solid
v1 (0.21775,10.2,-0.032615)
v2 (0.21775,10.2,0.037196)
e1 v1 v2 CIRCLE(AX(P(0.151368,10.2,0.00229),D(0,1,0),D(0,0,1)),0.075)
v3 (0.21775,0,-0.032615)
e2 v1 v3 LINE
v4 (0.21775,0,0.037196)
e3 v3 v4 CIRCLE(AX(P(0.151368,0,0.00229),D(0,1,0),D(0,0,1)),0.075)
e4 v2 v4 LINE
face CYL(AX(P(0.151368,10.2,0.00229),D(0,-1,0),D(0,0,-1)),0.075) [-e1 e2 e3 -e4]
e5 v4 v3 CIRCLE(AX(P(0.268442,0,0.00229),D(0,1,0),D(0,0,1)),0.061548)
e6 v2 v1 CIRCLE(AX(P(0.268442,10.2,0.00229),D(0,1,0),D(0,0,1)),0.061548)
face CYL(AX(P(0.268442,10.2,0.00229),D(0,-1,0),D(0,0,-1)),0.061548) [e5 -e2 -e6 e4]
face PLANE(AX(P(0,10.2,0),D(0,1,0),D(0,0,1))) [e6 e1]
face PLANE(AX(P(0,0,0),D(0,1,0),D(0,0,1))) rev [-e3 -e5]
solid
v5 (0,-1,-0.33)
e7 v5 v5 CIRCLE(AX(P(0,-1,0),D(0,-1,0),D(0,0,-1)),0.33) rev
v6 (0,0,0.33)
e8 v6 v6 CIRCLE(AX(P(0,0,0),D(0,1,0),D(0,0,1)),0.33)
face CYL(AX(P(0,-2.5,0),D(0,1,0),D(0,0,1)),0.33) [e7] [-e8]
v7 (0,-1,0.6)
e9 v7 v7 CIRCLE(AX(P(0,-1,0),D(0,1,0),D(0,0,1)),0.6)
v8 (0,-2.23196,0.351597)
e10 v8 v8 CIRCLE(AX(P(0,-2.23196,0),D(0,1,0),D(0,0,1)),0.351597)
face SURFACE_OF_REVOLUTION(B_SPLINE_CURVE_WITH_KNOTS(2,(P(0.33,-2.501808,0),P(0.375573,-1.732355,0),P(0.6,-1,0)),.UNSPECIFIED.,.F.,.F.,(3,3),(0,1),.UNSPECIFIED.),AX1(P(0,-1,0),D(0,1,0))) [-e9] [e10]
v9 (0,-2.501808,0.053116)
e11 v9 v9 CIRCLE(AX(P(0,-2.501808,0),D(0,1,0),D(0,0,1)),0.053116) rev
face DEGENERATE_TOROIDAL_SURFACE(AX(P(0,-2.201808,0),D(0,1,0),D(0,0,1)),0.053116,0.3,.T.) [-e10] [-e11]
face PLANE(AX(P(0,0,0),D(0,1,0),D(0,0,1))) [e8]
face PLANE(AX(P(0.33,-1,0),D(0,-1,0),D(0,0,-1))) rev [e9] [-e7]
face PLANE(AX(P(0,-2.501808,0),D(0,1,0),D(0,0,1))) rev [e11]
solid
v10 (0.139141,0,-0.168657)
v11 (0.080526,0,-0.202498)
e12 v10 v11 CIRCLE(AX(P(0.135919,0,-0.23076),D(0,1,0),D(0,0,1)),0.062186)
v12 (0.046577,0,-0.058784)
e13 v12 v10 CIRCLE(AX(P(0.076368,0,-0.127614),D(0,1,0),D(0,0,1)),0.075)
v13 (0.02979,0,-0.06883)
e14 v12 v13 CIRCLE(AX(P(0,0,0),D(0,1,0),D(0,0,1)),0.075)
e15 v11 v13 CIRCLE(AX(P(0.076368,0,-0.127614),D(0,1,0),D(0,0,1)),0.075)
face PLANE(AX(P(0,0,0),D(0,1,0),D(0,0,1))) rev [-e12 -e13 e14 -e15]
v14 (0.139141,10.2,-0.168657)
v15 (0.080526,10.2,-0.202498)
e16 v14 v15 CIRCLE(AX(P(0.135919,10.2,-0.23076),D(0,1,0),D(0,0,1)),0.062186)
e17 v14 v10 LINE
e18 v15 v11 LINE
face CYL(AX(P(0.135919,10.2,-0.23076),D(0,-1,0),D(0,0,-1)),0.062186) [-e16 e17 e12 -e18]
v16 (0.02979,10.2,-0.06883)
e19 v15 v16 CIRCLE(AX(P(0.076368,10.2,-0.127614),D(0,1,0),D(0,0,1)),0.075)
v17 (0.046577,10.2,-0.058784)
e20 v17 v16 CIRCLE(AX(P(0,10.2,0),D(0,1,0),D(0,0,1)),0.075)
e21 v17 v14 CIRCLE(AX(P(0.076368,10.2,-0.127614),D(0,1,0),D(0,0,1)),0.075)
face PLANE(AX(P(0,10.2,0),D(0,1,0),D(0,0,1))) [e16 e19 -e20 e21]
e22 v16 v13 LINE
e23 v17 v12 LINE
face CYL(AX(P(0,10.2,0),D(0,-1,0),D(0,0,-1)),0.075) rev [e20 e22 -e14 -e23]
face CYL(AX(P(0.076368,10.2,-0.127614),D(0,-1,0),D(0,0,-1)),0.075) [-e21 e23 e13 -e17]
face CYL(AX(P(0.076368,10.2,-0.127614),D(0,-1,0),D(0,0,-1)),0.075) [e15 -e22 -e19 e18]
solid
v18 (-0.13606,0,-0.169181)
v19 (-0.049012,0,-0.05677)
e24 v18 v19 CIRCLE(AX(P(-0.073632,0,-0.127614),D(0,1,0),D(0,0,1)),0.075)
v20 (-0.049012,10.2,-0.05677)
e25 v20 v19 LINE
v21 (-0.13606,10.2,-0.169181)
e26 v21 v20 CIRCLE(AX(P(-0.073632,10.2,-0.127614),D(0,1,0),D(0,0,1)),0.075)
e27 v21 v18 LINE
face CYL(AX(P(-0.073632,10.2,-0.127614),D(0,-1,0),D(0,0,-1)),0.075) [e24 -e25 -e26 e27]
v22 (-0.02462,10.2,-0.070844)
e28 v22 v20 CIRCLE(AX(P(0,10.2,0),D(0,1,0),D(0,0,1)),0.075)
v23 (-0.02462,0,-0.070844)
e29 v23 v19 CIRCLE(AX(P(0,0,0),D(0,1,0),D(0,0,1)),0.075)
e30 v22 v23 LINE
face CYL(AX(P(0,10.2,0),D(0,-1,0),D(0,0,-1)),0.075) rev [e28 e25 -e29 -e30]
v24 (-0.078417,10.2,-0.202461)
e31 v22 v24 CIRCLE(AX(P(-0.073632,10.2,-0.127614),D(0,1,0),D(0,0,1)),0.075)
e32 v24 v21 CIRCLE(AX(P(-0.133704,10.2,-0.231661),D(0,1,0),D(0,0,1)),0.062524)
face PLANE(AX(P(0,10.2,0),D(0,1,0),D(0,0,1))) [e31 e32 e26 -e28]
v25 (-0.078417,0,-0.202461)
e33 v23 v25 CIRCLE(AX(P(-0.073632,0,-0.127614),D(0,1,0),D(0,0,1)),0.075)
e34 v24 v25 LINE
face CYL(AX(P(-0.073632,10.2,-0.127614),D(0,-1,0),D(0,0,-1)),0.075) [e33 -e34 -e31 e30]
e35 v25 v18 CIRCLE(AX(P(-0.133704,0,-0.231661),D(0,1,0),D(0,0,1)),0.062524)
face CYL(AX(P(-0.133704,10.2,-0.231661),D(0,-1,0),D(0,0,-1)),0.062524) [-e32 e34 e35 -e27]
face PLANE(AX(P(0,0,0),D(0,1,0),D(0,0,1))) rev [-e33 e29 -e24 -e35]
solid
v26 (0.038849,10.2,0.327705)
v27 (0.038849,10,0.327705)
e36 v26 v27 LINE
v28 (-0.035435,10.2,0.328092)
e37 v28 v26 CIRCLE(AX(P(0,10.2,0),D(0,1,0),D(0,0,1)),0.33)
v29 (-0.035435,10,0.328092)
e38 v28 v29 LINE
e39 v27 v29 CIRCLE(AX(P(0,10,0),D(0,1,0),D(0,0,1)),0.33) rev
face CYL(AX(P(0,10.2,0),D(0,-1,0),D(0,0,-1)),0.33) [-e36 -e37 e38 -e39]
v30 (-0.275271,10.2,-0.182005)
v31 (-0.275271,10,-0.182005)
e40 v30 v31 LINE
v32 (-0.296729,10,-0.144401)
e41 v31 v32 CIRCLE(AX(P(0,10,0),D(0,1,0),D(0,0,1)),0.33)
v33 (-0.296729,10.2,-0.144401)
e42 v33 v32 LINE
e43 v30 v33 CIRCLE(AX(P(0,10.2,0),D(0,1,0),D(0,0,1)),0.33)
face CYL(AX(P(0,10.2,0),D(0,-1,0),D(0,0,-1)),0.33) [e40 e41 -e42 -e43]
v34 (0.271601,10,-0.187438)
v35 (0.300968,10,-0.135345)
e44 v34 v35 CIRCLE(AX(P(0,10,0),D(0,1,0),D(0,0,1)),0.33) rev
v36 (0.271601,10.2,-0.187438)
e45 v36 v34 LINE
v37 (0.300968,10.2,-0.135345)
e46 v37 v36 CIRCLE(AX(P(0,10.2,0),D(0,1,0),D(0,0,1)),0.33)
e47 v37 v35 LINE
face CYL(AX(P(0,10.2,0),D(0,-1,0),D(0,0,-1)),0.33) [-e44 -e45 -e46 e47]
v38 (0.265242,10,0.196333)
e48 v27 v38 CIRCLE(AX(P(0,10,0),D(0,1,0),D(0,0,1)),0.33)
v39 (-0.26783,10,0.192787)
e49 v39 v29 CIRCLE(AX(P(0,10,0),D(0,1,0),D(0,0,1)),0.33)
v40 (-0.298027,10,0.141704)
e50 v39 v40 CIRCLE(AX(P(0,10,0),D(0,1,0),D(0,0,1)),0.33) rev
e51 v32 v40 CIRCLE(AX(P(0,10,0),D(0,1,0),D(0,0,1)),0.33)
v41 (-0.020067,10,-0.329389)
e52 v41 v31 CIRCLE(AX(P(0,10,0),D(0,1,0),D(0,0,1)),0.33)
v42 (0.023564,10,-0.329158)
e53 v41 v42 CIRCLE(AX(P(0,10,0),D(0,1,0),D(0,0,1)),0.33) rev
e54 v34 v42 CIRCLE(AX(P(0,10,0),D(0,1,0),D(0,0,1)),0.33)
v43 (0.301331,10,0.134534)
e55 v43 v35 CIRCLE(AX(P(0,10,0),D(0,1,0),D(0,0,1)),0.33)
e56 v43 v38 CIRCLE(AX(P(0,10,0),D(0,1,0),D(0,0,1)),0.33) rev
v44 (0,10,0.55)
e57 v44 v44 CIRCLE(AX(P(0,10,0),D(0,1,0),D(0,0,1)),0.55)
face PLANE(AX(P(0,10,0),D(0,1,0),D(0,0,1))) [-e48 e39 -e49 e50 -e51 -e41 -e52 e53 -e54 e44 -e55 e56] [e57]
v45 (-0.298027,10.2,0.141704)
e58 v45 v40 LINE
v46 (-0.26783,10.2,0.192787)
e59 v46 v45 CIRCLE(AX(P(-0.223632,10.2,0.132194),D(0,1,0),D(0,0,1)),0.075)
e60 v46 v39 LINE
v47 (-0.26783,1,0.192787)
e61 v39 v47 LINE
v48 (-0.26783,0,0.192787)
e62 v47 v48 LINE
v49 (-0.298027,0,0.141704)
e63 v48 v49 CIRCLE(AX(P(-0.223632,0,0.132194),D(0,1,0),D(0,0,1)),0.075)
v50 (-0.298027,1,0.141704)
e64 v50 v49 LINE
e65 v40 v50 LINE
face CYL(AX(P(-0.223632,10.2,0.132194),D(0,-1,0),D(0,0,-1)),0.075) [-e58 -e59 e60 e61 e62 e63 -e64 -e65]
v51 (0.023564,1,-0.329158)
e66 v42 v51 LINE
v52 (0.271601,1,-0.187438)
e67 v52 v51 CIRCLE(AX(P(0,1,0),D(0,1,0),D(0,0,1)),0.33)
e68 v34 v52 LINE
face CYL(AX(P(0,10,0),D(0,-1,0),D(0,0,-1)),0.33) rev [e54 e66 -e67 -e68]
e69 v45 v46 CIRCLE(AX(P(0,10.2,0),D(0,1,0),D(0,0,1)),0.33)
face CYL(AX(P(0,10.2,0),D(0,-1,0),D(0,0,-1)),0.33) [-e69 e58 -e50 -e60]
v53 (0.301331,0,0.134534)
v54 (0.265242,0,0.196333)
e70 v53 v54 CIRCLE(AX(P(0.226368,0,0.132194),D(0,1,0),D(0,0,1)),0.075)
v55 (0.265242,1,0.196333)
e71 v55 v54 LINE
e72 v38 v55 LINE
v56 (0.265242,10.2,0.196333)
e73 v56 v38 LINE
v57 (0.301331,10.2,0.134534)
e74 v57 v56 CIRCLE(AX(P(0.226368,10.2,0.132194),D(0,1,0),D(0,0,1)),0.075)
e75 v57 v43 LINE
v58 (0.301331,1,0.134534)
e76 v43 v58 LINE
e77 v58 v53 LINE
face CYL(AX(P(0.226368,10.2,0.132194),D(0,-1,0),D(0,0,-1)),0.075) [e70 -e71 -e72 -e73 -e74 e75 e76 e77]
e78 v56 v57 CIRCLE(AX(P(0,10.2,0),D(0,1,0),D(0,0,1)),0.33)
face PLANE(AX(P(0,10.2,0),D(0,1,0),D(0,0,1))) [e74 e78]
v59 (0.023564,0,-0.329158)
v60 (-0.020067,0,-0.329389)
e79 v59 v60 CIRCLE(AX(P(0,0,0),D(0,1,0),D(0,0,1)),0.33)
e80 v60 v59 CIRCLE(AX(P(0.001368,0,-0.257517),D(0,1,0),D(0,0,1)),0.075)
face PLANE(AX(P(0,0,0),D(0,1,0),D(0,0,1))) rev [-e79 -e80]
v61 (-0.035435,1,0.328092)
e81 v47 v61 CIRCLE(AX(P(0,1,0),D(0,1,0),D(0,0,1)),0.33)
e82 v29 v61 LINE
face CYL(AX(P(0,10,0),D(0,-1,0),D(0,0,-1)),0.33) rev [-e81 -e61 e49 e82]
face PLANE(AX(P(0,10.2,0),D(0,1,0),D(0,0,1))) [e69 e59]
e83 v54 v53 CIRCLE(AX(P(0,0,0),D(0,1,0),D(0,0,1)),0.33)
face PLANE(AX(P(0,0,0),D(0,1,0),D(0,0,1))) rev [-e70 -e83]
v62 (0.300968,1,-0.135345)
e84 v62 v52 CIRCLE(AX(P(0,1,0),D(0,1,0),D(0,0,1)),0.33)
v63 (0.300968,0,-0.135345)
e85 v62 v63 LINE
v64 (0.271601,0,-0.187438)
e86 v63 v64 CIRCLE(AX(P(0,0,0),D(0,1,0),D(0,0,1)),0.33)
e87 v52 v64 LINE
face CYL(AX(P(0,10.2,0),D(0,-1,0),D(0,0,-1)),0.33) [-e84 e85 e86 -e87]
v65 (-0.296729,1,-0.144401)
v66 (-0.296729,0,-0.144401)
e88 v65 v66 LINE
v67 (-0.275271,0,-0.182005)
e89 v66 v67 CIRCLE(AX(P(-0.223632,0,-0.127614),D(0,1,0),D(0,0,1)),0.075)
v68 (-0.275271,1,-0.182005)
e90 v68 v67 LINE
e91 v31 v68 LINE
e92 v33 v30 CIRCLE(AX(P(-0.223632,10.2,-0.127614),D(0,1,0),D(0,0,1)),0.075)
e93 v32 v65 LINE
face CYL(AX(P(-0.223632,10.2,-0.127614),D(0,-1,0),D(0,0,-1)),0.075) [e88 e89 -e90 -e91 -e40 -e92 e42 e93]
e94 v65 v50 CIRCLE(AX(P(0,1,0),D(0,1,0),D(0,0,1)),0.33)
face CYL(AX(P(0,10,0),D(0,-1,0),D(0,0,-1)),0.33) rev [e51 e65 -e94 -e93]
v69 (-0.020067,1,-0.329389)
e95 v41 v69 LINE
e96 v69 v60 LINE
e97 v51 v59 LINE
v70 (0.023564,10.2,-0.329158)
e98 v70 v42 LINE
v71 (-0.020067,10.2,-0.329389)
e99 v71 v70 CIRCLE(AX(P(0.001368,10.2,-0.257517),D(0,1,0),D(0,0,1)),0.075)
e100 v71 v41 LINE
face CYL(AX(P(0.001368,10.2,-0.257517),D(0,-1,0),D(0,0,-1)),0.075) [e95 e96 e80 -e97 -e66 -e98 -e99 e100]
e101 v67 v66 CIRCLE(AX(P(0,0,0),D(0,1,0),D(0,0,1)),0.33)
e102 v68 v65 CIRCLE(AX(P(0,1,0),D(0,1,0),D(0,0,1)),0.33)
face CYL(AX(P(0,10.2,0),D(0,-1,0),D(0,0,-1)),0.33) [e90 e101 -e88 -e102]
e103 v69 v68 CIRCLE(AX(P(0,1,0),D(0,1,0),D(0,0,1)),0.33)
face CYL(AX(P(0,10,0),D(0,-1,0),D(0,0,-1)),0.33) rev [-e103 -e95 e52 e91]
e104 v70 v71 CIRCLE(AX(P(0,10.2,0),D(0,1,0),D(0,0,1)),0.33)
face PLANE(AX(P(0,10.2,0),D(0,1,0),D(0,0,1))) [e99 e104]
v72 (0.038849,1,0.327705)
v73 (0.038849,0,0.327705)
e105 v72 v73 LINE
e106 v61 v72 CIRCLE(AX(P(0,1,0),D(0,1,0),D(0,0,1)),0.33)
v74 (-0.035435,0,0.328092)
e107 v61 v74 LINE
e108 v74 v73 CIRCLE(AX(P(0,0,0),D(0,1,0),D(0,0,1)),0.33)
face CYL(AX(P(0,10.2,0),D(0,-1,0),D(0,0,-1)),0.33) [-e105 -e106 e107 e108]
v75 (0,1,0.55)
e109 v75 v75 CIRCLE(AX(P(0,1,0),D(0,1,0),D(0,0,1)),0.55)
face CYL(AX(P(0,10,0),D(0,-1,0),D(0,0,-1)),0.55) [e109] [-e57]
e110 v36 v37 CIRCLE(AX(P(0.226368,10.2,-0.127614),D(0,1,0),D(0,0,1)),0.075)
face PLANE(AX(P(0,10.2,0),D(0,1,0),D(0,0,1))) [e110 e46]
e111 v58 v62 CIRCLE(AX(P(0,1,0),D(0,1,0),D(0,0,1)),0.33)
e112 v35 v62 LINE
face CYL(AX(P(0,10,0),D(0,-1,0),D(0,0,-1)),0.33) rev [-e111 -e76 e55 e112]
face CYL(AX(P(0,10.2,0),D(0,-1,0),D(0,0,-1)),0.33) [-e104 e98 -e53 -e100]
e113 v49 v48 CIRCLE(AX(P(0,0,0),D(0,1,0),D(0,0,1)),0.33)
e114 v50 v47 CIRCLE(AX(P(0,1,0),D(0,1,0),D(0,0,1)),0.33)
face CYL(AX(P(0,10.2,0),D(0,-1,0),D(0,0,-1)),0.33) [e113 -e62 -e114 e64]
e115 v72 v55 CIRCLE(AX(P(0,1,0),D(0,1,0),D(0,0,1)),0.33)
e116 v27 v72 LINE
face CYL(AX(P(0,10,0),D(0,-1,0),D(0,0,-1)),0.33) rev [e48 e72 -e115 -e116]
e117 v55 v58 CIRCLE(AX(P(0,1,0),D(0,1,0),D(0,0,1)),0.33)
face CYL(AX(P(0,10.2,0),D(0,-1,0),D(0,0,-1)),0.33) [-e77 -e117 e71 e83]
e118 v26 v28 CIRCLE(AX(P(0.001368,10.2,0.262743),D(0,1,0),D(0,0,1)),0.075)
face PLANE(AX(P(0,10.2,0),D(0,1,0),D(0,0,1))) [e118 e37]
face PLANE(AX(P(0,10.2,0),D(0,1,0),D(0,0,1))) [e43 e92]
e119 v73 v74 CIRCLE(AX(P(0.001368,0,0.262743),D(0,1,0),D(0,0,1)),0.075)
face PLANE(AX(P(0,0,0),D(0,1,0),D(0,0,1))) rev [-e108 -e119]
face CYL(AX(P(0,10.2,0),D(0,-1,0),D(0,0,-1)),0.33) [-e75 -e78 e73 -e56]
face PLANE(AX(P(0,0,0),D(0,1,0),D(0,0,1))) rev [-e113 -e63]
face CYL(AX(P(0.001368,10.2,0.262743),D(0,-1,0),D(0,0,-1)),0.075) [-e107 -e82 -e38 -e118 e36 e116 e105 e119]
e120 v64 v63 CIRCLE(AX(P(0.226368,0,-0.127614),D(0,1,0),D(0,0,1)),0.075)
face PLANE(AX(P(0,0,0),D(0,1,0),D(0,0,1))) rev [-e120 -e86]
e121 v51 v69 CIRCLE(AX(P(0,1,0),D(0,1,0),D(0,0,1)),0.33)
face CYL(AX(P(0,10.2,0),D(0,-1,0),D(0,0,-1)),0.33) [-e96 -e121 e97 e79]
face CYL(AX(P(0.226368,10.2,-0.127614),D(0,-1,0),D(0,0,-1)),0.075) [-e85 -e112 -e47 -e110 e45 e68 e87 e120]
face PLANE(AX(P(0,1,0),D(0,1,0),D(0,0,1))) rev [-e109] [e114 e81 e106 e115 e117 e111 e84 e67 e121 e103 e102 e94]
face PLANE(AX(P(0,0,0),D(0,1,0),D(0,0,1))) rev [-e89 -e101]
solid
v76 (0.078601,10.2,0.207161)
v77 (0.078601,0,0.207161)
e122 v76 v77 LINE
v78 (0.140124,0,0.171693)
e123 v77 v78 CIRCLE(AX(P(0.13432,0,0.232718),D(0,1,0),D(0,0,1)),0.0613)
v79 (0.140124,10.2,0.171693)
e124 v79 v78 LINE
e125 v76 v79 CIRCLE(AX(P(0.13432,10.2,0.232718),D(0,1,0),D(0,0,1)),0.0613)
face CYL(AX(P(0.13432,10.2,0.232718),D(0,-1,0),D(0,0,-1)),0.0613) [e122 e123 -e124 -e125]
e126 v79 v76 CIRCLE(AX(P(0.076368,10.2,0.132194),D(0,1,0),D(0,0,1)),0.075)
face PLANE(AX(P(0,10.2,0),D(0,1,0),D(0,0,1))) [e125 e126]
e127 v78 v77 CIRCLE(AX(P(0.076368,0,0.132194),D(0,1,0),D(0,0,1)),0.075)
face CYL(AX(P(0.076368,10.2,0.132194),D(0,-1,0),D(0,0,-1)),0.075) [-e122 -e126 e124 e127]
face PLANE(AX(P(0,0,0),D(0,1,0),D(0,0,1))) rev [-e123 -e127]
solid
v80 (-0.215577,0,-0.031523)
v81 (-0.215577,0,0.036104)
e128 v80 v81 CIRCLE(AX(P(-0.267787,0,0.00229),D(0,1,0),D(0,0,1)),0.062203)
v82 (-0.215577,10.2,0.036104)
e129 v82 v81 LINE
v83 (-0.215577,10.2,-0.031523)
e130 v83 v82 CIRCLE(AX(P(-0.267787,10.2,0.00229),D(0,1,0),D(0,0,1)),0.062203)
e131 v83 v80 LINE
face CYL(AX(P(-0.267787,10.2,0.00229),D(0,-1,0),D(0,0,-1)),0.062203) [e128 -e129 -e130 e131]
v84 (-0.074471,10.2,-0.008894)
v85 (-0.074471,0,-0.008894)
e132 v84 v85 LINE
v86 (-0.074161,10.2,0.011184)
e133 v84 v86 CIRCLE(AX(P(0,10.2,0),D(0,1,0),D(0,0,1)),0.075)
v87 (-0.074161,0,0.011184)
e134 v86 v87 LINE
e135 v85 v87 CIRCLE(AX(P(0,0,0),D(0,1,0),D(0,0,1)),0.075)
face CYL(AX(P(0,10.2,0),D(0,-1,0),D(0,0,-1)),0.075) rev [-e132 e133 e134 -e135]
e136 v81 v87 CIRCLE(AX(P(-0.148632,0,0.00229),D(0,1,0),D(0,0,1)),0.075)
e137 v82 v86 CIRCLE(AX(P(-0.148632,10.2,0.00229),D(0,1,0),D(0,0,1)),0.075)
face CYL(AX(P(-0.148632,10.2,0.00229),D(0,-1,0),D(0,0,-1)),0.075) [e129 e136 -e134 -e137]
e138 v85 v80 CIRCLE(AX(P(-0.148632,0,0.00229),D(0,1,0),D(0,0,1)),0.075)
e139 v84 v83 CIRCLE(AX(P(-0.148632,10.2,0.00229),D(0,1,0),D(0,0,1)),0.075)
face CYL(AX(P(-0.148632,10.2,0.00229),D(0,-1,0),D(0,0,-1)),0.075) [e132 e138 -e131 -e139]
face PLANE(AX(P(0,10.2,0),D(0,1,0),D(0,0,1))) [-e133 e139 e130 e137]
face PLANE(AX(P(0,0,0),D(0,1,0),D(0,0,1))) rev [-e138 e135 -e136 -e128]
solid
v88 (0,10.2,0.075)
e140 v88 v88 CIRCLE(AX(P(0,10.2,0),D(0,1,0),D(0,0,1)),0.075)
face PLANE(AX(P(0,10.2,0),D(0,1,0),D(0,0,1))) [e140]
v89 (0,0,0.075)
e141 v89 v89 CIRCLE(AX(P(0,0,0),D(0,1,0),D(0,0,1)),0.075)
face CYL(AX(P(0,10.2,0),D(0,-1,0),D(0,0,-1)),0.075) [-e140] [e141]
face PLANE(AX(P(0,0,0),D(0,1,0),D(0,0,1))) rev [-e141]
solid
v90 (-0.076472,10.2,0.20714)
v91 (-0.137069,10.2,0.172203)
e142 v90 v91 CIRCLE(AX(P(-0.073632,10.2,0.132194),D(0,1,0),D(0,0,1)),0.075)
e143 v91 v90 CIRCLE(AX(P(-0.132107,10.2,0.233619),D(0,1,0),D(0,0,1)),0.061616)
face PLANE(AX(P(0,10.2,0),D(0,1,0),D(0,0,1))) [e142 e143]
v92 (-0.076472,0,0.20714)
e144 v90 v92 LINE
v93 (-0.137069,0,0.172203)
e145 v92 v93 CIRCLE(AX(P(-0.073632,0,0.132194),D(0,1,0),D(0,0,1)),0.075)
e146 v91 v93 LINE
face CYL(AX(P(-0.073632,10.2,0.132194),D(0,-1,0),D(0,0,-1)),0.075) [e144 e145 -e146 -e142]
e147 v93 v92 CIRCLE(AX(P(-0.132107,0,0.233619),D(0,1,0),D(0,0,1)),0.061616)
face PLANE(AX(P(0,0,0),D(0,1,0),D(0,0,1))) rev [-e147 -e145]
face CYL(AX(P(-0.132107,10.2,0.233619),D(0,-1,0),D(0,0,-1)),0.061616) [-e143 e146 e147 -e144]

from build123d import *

# Parameters (mm, degrees)
EXTRUDE_2_OUTLINE_R = 0.075
EXTRUDE_2_DEPTH     = 10.2
EXTRUDE_2_2_DEPTH   = 10.2
EXTRUDE_2_3_DEPTH   = 10.2
EXTRUDE_2_4_DEPTH   = 10.2
EXTRUDE_2_5_DEPTH   = 10.2
EXTRUDE_2_6_DEPTH   = 10.2
EXTRUDE_2_7_DEPTH   = 10.2
EXTRUDE_2_8_DEPTH   = 10.2
EXTRUDE_2_9_DEPTH   = 10.2
EXTRUDE_2_10_DEPTH  = 10.2
EXTRUDE_2_11_DEPTH  = 10.2
EXTRUDE_2_12_DEPTH  = 10.2
EXTRUDE_2_13_DEPTH  = 10.2
EXTRUDE_5_DEPTH     = 2.5
EXTRUDE_START       = 1
SKETCH_3_R          = 0.55
SKETCH_3_R_2        = 0.33
EXTRUDE_6_DEPTH     = 9
FILLET_3_R          = 0.3


# Read off the part's stored shape, not the designer's step: Бобышка-Вытянуть2
with BuildPart() as part:
    # Бобышка-Вытянуть2 outline → Бобышка-Вытянуть2 (new body)
    with BuildSketch(Plane(origin=(0, 0, 0), x_dir=(1, 0, 0), z_dir=(0, 1, 0))):
        Circle(EXTRUDE_2_OUTLINE_R)
    extrude(amount=EXTRUDE_2_DEPTH)


with BuildPart() as body_2:
    # Extrude 2 2 outline → Extrude 2 2 (new body)
    with BuildSketch(Plane(origin=(0, 0, 0), x_dir=(1, 0, 0), z_dir=(0, 1, 0))):
        with BuildLine():
            ThreePointArc((-0.215577435, 0.031523255), (-0.329990207, -0.00229018), (-0.215577435, -0.036103616))
            ThreePointArc((-0.215577435, -0.036103616), (-0.135616584, -0.076152155), (-0.074161469, -0.011183762))
            ThreePointArc((-0.074161469, -0.011183762), (-0.074991098, -0.00115549), (-0.074470828, 0.008893581))
            ThreePointArc((-0.074470828, 0.008893581), (-0.136756085, 0.071763554), (-0.215577435, 0.031523255))
        make_face()
    extrude(amount=EXTRUDE_2_2_DEPTH)



with BuildPart() as body_3:
    # Extrude 2 3 outline → Extrude 2 3 (new body)
    with BuildSketch(Plane(origin=(0, 0, 0), x_dir=(1, 0, 0), z_dir=(0, 1, 0))):
        with BuildLine():
            ThreePointArc((-0.078416857, 0.202460861), (-0.164965898, 0.285808068), (-0.13605962, 0.169180796))
            ThreePointArc((-0.13605962, 0.169180796), (-0.132931564, 0.081694169), (-0.049012134, 0.056769805))
            ThreePointArc((-0.049012134, 0.056769805), (-0.03748264, 0.064961925), (-0.024620163, 0.070843825))
            ThreePointArc((-0.024620163, 0.070843825), (-0.004207657, 0.155990018), (-0.078416857, 0.202460861))
        make_face()
    extrude(amount=EXTRUDE_2_3_DEPTH)


with BuildPart() as body_4:
    # Extrude 2 4 outline → Extrude 2 4 (new body)
    with BuildSketch(Plane(origin=(0, 0, 0), x_dir=(1, 0, 0), z_dir=(0, 1, 0))):
        with BuildLine():
            ThreePointArc((0.139140572, 0.168657106), (0.167012389, 0.284614831), (0.080525962, 0.202498267))
            ThreePointArc((0.080525962, 0.202498267), (0.006248792, 0.154228257), (0.029790206, 0.068829817))
            ThreePointArc((0.029790206, 0.068829817), (0.038512817, 0.06435653), (0.046577497, 0.058783813))
            ThreePointArc((0.046577497, 0.058783813), (0.133726217, 0.079291783), (0.139140572, 0.168657106))
        make_face()
    extrude(amount=EXTRUDE_2_4_DEPTH)


with BuildPart() as body_5:
    # Extrude 2 5 outline → Extrude 2 5 (new body)
    with BuildSketch(Plane(origin=(0, 0, 0), x_dir=(1, 0, 0), z_dir=(0, 1, 0))):
        with BuildLine():
            ThreePointArc((0.217749972, -0.037195687), (0.329990231, -0.002290181), (0.217749972, 0.032615326))
            ThreePointArc((0.217749972, 0.032615326), (0.076367703, -0.00229018), (0.217749972, -0.037195687))
        make_face()
    extrude(amount=EXTRUDE_2_5_DEPTH)


with BuildPart() as body_6:
    # Extrude 2 6 outline → Extrude 2 6 (new body)
    with BuildSketch(Plane(origin=(0, 0, 0), x_dir=(1, 0, 0), z_dir=(0, 1, 0))):
        with BuildLine():
            ThreePointArc((0.078601287, -0.207160724), (0.164936529, -0.285825011), (0.140123873, -0.171692736))
            ThreePointArc((0.140123873, -0.171692736), (0.038908974, -0.067218275), (0.078601287, -0.207160724))
        make_face()
    extrude(amount=EXTRUDE_2_6_DEPTH)


with BuildPart() as body_7:
    # Extrude 2 7 outline → Extrude 2 7 (new body)
    with BuildSketch(Plane(origin=(0, 0, 0), x_dir=(1, 0, 0), z_dir=(0, 1, 0))):
        with BuildLine():
            ThreePointArc((-0.137069196, -0.172203487), (-0.162882691, -0.286998397), (-0.076471576, -0.207140228))
            ThreePointArc((-0.076471576, -0.207140228), (-0.036171958, -0.067219203), (-0.137069196, -0.172203487))
        make_face()
    extrude(amount=EXTRUDE_2_7_DEPTH)


with BuildPart() as body_8:
    # Extrude 2 8 outline → Extrude 2 8 (new body)
    with BuildSketch(Plane(origin=(0, 0, 0), x_dir=(1, 0, 0), z_dir=(0, 1, 0))):
        with BuildLine():
            ThreePointArc((-0.296729349, 0.144401155), (-0.158491958, 0.090441918), (-0.275270897, 0.182005311))
            ThreePointArc((-0.275270897, 0.182005311), (-0.286617495, 0.163555531), (-0.296729349, 0.144401155))
        make_face()
    extrude(amount=EXTRUDE_2_8_DEPTH)


with BuildPart() as body_9:
    # Extrude 2 9 outline → Extrude 2 9 (new body)
    with BuildSketch(Plane(origin=(0, 0, 0), x_dir=(1, 0, 0), z_dir=(0, 1, 0))):
        with BuildLine():
            ThreePointArc((-0.267830407, -0.192787118), (-0.159068831, -0.0940291), (-0.29802696, -0.141703673))
            ThreePointArc((-0.29802696, -0.141703673), (-0.284079249, -0.16792552), (-0.267830407, -0.192787118))
        make_face()
    extrude(amount=EXTRUDE_2_9_DEPTH)


with BuildPart() as body_10:
    # Extrude 2 10 outline → Extrude 2 10 (new body)
    with BuildSketch(Plane(origin=(0, 0, 0), x_dir=(1, 0, 0), z_dir=(0, 1, 0))):
        with BuildLine():
            ThreePointArc((-0.020066658, 0.329389328), (0.000969374, 0.182518498), (0.023564272, 0.329157599))
            ThreePointArc((0.023564272, 0.329157599), (0.001752641, 0.329995346), (-0.020066658, 0.329389328))
        make_face()
    extrude(amount=EXTRUDE_2_10_DEPTH)


with BuildPart() as body_11:
    # Extrude 2 11 outline → Extrude 2 11 (new body)
    with BuildSketch(Plane(origin=(0, 0, 0), x_dir=(1, 0, 0), z_dir=(0, 1, 0))):
        with BuildLine():
            ThreePointArc((0.038848965, -0.327705291), (0.000977296, -0.187743587), (-0.03543522, -0.328091977))
            ThreePointArc((-0.03543522, -0.328091977), (0.001717788, -0.329995529), (0.038848965, -0.327705291))
        make_face()
    extrude(amount=EXTRUDE_2_11_DEPTH)


with BuildPart() as body_12:
    # Extrude 2 12 outline → Extrude 2 12 (new body)
    with BuildSketch(Plane(origin=(0, 0, 0), x_dir=(1, 0, 0), z_dir=(0, 1, 0))):
        with BuildLine():
            ThreePointArc((0.301331175, -0.134534467), (0.161602494, -0.094372467), (0.265242363, -0.196332597))
            ThreePointArc((0.265242363, -0.196332597), (0.284966921, -0.166414705), (0.301331175, -0.134534467))
        make_face()
    extrude(amount=EXTRUDE_2_12_DEPTH)


with BuildPart() as body_13:
    # Extrude 2 13 outline → Extrude 2 13 (new body)
    with BuildSketch(Plane(origin=(0, 0, 0), x_dir=(1, 0, 0), z_dir=(0, 1, 0))):
        with BuildLine():
            ThreePointArc((0.271600665, 0.1874382), (0.16103432, 0.090782272), (0.300968191, 0.135344552))
            ThreePointArc((0.300968191, 0.135344552), (0.287466887, 0.162057981), (0.271600665, 0.1874382))
        make_face()
    extrude(amount=EXTRUDE_2_13_DEPTH)


with BuildPart() as body_14:
    # Эскиз2 → Бобышка-Вытянуть5 (new body)
    with BuildSketch(Plane(origin=(0, 0, 0), x_dir=(1, 0, 0), z_dir=(0, 1, 0))):
        with BuildLine():
            ThreePointArc((-0.020066658, 0.329389328), (-0.165035087, 0.285768123), (-0.275270897, 0.182005311))
            ThreePointArc((-0.275270897, 0.182005311), (-0.286617495, 0.163555531), (-0.296729349, 0.144401155))
            ThreePointArc((-0.296729349, 0.144401155), (-0.329996606, 0.00149668), (-0.29802696, -0.141703673))
            ThreePointArc((-0.29802696, -0.141703673), (-0.284079249, -0.16792552), (-0.267830407, -0.192787118))
            ThreePointArc((-0.267830407, -0.192787118), (-0.166040241, -0.285185271), (-0.03543522, -0.328091977))
            ThreePointArc((-0.03543522, -0.328091977), (0.001717788, -0.329995529), (0.038848965, -0.327705291))
            ThreePointArc((0.038848965, -0.327705291), (0.165627836, -0.285424981), (0.265242363, -0.196332597))
            ThreePointArc((0.265242363, -0.196332597), (0.284966921, -0.166414705), (0.301331175, -0.134534467))
            ThreePointArc((0.301331175, -0.134534467), (0.322753225, -0.068777584), (0.33, 0))
            ThreePointArc((0.33, 0), (0.322660428, 0.069211621), (0.300968191, 0.135344552))
            ThreePointArc((0.300968191, 0.135344552), (0.287466887, 0.162057981), (0.271600665, 0.1874382))
            ThreePointArc((0.271600665, 0.1874382), (0.163712193, 0.28652804), (0.023564272, 0.329157599))
            ThreePointArc((0.023564272, 0.329157599), (0.001752641, 0.329995346), (-0.020066658, 0.329389328))
        make_face()
    extrude(amount=-EXTRUDE_5_DEPTH)

    # Эскиз5 → Повернуть1 (revolve)
    with BuildSketch(Plane(origin=(0, 0, 0), x_dir=(-1, 0, 0), z_dir=(0, 0, 1)), mode=Mode.PRIVATE) as revolve_1_sk:
        with BuildLine():
            Line((-0.33, 1), (-0.6, 1))
            add(Edge.make_bspline(
                [(-0.33, 2.501807797), (-0.375572962, 1.732354596), (-0.6, 1)],
                knots=[0, 0, 0, 1, 1, 1], degree=2))
            Line((-0.33, 2.501807797), (0, 2.501807797))
            Line((0, 2.501807797), (0, 1))
            Line((0, 1), (-0.33, 1))
        make_face()
    revolve(revolve_1_sk.sketch.rotate(Axis((0, -1, 0), (0, -1, 0)), 90), axis=Axis((0, -1, 0), (0, -1, 0)))

    # Скругление3
    fillet_3_edges = [body_14.edges().sort_by_distance(p)[0] for p in [
        (0, -2.501807797, -0.33),
    ]]
    fillet(fillet_3_edges, radius=FILLET_3_R)


with BuildPart() as body_2_1:
    add(body_2.part)

    add(body_3.part)  # Бобышка-Вытянуть6 merges body 3

    add(body_4.part)  # Бобышка-Вытянуть6 merges body 4

    add(body_5.part)  # Бобышка-Вытянуть6 merges body 5

    add(body_6.part)  # Бобышка-Вытянуть6 merges body 6

    add(body_7.part)  # Бобышка-Вытянуть6 merges body 7

    add(body_8.part)  # Бобышка-Вытянуть6 merges body 8

    add(body_9.part)  # Бобышка-Вытянуть6 merges body 9

    add(body_10.part)  # Бобышка-Вытянуть6 merges body 10

    add(body_11.part)  # Бобышка-Вытянуть6 merges body 11

    add(body_12.part)  # Бобышка-Вытянуть6 merges body 12

    add(body_13.part)  # Бобышка-Вытянуть6 merges body 13
    # Эскиз3 → Бобышка-Вытянуть6 (add)
    with BuildSketch(Plane(origin=(0, 0, 0), x_dir=(1, 0, 0), z_dir=(0, 1, 0)).offset(EXTRUDE_START)):
        with Locations(Location((0, 0, 0), (0, 0, 270))):
            Circle(SKETCH_3_R)
        with Locations(Location((0, 0, 0), (0, 0, 270))):
            Circle(SKETCH_3_R_2, mode=Mode.SUBTRACT)
    extrude(amount=EXTRUDE_6_DEPTH)


solid = Compound([part.part, body_14.part, body_2_1.part])
